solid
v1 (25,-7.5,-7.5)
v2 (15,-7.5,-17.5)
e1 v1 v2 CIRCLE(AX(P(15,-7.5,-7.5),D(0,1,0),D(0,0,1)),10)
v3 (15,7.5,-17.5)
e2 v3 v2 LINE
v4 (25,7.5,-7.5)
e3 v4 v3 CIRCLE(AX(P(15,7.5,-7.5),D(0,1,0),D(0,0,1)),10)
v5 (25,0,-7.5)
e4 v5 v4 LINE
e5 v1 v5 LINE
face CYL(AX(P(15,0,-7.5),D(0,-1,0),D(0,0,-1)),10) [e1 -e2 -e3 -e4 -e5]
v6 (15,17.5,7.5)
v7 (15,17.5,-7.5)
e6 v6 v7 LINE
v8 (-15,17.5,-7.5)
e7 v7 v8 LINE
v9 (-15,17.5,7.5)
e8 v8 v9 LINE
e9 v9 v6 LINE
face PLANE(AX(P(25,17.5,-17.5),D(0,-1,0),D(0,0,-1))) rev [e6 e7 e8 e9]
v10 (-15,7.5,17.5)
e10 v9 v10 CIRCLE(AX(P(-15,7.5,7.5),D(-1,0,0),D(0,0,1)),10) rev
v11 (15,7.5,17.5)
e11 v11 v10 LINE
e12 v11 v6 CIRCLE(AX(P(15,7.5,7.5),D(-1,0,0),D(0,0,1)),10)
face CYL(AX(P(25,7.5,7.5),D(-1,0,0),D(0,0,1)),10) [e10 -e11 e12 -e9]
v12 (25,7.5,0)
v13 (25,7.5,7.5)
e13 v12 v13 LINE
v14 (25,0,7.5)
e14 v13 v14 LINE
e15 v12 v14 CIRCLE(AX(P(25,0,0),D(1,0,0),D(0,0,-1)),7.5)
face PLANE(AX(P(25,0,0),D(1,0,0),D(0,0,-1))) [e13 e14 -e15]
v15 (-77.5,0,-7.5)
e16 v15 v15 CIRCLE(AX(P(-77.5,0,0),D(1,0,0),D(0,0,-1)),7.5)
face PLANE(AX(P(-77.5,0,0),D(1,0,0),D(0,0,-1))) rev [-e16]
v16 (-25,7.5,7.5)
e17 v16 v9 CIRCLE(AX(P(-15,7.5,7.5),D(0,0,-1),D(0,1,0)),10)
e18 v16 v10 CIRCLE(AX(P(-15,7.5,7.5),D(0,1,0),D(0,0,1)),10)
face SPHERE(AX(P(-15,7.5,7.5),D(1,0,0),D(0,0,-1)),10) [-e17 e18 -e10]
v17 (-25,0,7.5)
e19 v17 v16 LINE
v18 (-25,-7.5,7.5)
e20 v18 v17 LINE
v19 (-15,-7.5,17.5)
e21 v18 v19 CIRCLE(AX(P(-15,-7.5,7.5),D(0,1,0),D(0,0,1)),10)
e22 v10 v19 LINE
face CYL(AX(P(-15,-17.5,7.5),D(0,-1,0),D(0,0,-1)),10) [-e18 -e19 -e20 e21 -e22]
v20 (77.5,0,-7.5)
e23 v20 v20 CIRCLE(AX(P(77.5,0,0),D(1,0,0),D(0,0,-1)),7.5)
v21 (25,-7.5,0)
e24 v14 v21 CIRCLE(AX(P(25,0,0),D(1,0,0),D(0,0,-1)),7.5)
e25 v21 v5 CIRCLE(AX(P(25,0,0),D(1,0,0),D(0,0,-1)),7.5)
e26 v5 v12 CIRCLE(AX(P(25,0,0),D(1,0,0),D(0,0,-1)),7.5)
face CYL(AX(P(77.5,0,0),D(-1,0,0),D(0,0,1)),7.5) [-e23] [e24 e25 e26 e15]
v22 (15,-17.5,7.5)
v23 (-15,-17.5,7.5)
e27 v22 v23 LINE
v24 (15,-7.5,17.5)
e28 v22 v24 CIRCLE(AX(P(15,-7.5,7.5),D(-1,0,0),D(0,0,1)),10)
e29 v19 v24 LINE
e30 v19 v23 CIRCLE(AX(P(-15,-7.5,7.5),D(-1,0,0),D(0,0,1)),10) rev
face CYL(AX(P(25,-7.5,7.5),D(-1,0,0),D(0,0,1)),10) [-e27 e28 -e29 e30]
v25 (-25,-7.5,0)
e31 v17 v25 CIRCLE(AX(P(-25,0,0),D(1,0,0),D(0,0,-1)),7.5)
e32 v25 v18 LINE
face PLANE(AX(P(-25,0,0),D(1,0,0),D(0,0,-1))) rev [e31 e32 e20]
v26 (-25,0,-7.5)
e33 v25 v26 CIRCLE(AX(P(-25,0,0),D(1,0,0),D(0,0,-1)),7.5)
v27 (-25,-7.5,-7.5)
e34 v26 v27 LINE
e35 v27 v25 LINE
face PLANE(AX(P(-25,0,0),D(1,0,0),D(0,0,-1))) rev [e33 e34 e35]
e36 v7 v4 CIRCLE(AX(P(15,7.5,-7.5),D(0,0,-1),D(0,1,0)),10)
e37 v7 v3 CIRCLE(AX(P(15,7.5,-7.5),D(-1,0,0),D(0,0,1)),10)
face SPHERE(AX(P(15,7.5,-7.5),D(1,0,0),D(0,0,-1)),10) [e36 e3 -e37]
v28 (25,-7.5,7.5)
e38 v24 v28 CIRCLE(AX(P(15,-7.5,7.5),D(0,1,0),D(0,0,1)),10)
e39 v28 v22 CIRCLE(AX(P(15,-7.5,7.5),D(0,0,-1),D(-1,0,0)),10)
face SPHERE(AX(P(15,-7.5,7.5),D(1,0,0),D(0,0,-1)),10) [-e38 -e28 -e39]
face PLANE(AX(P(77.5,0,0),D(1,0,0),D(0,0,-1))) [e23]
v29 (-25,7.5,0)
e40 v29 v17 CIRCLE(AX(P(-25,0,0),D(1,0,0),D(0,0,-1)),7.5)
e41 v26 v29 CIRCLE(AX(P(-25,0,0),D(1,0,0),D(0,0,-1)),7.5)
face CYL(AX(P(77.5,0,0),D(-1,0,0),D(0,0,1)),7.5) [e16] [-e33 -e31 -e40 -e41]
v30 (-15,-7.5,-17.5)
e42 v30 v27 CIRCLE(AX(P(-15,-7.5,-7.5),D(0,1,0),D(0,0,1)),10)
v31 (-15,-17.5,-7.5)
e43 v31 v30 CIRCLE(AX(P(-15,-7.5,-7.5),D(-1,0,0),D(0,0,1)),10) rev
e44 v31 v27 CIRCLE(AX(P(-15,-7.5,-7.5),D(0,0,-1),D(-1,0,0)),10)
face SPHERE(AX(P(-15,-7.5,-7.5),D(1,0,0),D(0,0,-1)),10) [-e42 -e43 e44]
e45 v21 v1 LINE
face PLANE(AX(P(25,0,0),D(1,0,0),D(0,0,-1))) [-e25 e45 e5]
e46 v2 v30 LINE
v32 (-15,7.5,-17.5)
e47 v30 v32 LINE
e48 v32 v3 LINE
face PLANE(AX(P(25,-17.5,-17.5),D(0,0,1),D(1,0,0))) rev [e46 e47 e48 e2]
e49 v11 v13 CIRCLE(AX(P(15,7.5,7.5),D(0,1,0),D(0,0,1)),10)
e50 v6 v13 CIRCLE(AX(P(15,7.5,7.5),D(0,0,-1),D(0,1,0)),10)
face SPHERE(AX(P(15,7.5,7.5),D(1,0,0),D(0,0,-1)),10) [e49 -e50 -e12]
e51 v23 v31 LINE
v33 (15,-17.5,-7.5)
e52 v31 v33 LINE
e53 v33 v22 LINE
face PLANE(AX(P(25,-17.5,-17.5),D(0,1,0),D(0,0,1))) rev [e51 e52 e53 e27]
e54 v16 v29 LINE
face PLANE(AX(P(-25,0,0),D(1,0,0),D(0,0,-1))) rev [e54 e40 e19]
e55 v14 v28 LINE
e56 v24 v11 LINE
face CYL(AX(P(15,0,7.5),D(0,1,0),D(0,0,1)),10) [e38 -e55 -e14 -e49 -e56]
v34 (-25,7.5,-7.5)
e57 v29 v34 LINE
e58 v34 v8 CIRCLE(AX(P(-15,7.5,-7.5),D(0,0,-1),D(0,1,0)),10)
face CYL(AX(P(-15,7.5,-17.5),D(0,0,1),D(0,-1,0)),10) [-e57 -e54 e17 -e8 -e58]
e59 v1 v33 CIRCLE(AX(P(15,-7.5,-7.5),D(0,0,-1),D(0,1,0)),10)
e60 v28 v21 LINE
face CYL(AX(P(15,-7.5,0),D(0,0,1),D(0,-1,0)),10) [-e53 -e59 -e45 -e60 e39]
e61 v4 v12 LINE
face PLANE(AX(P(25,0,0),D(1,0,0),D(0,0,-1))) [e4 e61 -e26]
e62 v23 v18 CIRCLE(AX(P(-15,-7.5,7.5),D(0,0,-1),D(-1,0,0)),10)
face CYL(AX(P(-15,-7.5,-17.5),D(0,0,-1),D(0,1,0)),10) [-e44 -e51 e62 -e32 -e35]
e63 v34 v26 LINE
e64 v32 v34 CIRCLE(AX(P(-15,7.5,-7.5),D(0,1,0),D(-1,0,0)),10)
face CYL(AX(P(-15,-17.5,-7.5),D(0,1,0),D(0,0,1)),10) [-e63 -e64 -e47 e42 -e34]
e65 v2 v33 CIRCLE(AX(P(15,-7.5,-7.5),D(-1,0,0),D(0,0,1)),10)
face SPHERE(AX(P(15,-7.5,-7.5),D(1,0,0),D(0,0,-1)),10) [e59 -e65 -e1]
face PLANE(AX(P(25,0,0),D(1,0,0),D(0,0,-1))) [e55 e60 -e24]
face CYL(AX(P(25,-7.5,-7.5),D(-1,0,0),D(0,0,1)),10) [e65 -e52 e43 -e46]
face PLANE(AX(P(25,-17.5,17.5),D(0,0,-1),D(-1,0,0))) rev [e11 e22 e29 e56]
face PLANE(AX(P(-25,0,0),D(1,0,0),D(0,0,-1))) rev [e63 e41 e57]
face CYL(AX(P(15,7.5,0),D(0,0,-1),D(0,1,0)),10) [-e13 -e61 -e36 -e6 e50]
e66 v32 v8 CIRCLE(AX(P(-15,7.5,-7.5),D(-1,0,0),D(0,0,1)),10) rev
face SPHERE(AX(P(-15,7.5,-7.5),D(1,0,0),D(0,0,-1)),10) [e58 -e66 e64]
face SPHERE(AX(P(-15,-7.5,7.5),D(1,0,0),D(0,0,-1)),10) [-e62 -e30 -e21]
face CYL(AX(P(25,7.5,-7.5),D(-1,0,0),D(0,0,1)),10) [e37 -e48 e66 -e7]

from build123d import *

# Parameters (mm, degrees)
SKETCH_2_R      = 7.5
EXTRUDE_1_DEPTH = 77.5
SKETCH_3_W      = 35
SKETCH_3_H      = 35
EXTRUDE_2_DEPTH = 25
FILLET_1_R      = 10
FILLET_2_R      = 10


with BuildPart() as part:
    # 草图2 → 凸台-拉伸1 (new, symmetric)
    with BuildSketch(Plane(origin=(0, 0, 0), x_dir=(0, 0, -1), z_dir=(1, 0, 0))):
        Circle(SKETCH_2_R)
    extrude(amount=EXTRUDE_1_DEPTH, both=True)

    # 草图3 → 凸台-拉伸2 (add, symmetric)
    with BuildSketch(Plane(origin=(0, 0, 0), x_dir=(0, 0, -1), z_dir=(1, 0, 0))):
        Rectangle(SKETCH_3_W, SKETCH_3_H)
    extrude(amount=EXTRUDE_2_DEPTH, both=True)

    # 圆角1
    fillet_1_edges = [part.edges().sort_by_distance(p)[0] for p in [
        (0, 17.5, 17.5),
        (0, -17.5, 17.5),
        (0, -17.5, -17.5),
        (0, 17.5, -17.5),
    ]]
    fillet(fillet_1_edges, radius=FILLET_1_R)

    # 圆角2
    fillet_2_edges = [part.edges().sort_by_distance(p)[0] for p in [
        (-25, 0, -17.5),
        (25, 0, -17.5),
        (-25, 0, 17.5),
        (-25, 17.5, 0),
        (-25, -17.5, 0),
        (-25, 14.571067812, 14.571067812),
        (-25, -14.571067812, 14.571067812),
        (-25, 14.571067812, -14.571067812),
        (-25, -14.571067812, -14.571067812),
        (25, -17.5, 0),
        (25, 0, 17.5),
        (25, 17.5, 0),
        (25, 14.571067812, 14.571067812),
        (25, -14.571067812, 14.571067812),
        (25, 14.571067812, -14.571067812),
        (25, -14.571067812, -14.571067812),
    ]]
    fillet(fillet_2_edges, radius=FILLET_2_R - 0.0001)  # a hair under: the kernel refuses the full size


solid = part.part
